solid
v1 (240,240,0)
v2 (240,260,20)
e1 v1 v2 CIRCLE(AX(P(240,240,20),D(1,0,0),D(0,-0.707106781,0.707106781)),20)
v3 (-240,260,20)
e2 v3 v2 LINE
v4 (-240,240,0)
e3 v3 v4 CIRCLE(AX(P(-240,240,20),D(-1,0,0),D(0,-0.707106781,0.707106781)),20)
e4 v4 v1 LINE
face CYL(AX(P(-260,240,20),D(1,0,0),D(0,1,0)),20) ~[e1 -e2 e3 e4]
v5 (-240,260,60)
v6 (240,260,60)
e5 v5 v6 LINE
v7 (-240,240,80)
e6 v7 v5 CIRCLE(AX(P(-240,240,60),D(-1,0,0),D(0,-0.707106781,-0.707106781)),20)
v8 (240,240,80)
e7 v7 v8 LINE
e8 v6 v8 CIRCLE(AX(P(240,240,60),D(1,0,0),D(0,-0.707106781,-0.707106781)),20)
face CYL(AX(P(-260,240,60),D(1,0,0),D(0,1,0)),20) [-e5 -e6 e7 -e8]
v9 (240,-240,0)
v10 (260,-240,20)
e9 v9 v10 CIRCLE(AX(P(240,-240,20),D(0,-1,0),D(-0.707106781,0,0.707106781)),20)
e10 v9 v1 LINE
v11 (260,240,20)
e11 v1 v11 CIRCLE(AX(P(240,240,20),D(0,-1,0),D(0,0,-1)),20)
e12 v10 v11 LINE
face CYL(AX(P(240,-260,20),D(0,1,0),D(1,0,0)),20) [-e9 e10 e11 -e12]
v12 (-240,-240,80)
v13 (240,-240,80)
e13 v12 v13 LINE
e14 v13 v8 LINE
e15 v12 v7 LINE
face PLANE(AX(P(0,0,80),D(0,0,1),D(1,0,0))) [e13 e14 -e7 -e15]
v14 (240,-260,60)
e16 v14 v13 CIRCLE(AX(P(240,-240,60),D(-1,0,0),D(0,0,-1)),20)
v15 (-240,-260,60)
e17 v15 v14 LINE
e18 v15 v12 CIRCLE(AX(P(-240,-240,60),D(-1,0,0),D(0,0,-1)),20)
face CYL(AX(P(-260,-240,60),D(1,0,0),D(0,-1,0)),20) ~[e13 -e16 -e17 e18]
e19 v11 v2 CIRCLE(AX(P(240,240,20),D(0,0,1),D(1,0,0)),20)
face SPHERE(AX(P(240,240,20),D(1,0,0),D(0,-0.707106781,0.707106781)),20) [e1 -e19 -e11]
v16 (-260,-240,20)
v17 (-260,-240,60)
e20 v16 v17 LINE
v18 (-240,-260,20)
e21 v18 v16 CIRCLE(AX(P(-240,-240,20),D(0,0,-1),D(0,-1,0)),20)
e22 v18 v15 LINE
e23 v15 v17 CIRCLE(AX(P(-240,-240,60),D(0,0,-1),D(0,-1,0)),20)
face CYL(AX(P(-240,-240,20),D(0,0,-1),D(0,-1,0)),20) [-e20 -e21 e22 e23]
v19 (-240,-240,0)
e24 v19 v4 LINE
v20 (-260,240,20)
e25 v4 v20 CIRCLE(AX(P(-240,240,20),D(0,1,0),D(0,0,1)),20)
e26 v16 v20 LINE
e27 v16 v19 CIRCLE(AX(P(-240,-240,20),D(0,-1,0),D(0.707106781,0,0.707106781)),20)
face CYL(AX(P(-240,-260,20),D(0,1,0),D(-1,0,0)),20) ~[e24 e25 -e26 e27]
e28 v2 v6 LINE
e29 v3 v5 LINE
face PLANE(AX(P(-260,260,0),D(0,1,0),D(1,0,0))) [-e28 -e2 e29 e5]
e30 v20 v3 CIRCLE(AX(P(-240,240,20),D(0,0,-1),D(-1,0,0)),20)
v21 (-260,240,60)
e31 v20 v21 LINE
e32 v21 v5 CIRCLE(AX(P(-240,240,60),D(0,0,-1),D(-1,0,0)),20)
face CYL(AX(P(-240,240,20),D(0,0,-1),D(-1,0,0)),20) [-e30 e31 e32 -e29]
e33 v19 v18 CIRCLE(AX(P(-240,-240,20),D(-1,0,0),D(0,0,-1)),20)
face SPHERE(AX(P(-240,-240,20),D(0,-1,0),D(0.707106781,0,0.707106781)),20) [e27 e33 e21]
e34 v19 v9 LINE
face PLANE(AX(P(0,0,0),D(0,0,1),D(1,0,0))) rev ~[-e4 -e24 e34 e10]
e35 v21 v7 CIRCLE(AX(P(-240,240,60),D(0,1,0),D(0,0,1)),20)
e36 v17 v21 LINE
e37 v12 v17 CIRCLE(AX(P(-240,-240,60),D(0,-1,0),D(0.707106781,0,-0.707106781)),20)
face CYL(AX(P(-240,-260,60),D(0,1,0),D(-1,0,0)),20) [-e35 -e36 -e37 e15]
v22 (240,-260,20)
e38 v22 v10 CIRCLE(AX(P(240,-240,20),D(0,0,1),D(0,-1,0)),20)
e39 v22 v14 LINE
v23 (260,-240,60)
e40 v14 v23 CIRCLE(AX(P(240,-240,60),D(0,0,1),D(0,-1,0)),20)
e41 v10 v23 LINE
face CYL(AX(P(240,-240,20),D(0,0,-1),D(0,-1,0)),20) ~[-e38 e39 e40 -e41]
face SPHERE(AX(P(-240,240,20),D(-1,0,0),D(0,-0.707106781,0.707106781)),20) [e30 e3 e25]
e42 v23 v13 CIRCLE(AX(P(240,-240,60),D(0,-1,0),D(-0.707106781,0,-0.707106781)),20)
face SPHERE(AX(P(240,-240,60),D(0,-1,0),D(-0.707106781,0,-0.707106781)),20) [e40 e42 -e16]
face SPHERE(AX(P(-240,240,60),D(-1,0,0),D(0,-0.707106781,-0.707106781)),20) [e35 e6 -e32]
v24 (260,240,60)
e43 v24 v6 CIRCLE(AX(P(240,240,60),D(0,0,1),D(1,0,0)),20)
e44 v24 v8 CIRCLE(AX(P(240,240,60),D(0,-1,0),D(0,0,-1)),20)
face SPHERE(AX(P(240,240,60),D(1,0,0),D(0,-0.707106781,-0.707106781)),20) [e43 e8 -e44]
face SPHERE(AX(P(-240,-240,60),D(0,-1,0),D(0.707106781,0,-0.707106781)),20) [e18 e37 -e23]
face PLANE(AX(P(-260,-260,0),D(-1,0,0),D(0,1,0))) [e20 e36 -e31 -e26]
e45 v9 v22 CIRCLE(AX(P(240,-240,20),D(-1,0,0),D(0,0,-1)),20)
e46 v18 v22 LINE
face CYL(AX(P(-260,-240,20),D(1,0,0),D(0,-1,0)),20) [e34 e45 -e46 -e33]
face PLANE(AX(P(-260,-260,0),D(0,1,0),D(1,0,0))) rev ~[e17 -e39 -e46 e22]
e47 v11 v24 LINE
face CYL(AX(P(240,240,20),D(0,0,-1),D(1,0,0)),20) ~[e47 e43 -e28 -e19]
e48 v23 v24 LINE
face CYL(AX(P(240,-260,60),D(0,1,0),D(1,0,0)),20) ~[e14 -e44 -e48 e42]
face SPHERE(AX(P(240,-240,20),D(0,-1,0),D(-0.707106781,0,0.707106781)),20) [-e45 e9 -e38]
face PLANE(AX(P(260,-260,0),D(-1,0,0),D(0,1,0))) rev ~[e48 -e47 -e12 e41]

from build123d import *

# Parameters (mm, degrees)
F0_W         = 520
F0_H         = 520
F1_DEPTH     = 80
F2_R         = 20
F3_T1_DEPTH  = 40
F3_S5_W      = 20
F3_S5_H      = 20
F3_T6_DEPTH  = 20
F3_S11_W     = 20
F3_S11_H     = 20
F3_T12_DEPTH = 20
F3_S17_W     = 20
F3_S17_H     = 20
F3_T18_DEPTH = 20
F3_S23_W     = 20
F3_S23_H     = 20
F3_T24_DEPTH = 20
F3_S29_W     = 20
F3_S29_H     = 20
F3_T30_DEPTH = 20
F3_S35_W     = 20
F3_S35_H     = 20
F3_T36_DEPTH = 20
F3_S41_W     = 20
F3_S41_H     = 20
F3_T42_DEPTH = 20
F3_S47_W     = 20
F3_S47_H     = 20
F3_T48_DEPTH = 20


# Not quite as in the source:
# - a fillet or chamfer that OpenCascade refuses, or shapes differently, is made with other operations: its cross-section is extruded or revolved along the edge and cut away or added


with BuildPart() as f1:
    # F0 (on Top) → F1 (new body)
    with BuildSketch(Plane.XY):
        Rectangle(F0_W, F0_H)
    extrude(amount=F1_DEPTH)

    # F2
    f2_edges = [f1.edges().sort_by_distance(p)[0] for p in [
        (260, 0, 80),
        (0, 260, 80),
        (-260, 0, 80),
        (0, -260, 80),
        (0, -260, 0),
        (260, 0, 0),
        (0, 260, 0),
        (-260, 0, 0),
    ]]
    fillet(f2_edges, radius=F2_R)

    # F3: fillet of radius 20 on 4 edges, made by hand

    # F3_s2 → F3_t1 (cut)
    with BuildSketch(Plane.XY.offset(20)):
        with BuildLine():
            ThreePointArc((240, -260), (254.1421356237, -254.1421356237), (260, -240))
            Line((260, -240), (260, -260))
            Line((260, -260), (240, -260))
        make_face()
        with BuildLine():
            ThreePointArc((260, 240), (254.1421356237, 254.1421356237), (240, 260))
            Line((240, 260), (260, 260))
            Line((260, 260), (260, 240))
        make_face()
        with BuildLine():
            ThreePointArc((-260, 240), (-254.1421356237, 254.1421356237), (-240, 260))
            Line((-240, 260), (-260, 260))
            Line((-260, 260), (-260, 240))
        make_face()
        with BuildLine():
            ThreePointArc((-240, -260), (-254.1421356237, -254.1421356237), (-260, -240))
            Line((-260, -240), (-260, -260))
            Line((-260, -260), (-240, -260))
        make_face()
    extrude(amount=F3_T1_DEPTH, mode=Mode.SUBTRACT)


with BuildPart() as f3_tool4:
    # F3_s5 → F3_t6 (new body)
    with BuildSketch(Plane.XZ.offset(240)):
        with Locations((-250, 10)):
            Rectangle(F3_S5_W, F3_S5_H)
    extrude(amount=F3_T6_DEPTH)

    # F3_s7 → F3_t8 (revolve, cut)
    with BuildSketch(Plane(origin=(-240, -240, 20), x_dir=(0.7071067812, 0, 0.7071067812), z_dir=(0.7071067812, 0, -0.7071067812))):
        with BuildLine():
            ThreePointArc((0, -20), (20, 0), (0, 20))
            Line((0, 20), (0, -20))
        make_face()
    revolve(axis=Axis((-240, -240, 20), (0, -1, 0)), mode=Mode.SUBTRACT)


with BuildPart() as f1_1:
    add(f1.part)

    # F3_t3: cut F3_tool4
    add(f3_tool4.part, mode=Mode.SUBTRACT)


with BuildPart() as f3_tool10:
    # F3_s11 → F3_t12 (new body)
    with BuildSketch(Plane.XZ.offset(240)):
        with Locations((-250, 70)):
            Rectangle(F3_S11_W, F3_S11_H)
    extrude(amount=F3_T12_DEPTH)

    # F3_s13 → F3_t14 (revolve, cut)
    with BuildSketch(Plane(origin=(-240, -240, 60), x_dir=(0.7071067812, 0, -0.7071067812), z_dir=(-0.7071067812, 0, -0.7071067812))):
        with BuildLine():
            ThreePointArc((0, -20), (20, 0), (0, 20))
            Line((0, 20), (0, -20))
        make_face()
    revolve(axis=Axis((-240, -240, 60), (0, -1, 0)), mode=Mode.SUBTRACT)


with BuildPart() as f1_2:
    add(f1_1.part)

    # F3_t9: cut F3_tool10
    add(f3_tool10.part, mode=Mode.SUBTRACT)


with BuildPart() as f3_tool16:
    # F3_s17 → F3_t18 (new body)
    with BuildSketch(Plane.YZ.offset(-240)):
        with Locations((250, 10)):
            Rectangle(F3_S17_W, F3_S17_H)
    extrude(amount=-F3_T18_DEPTH)

    # F3_s19 → F3_t20 (revolve, cut)
    with BuildSketch(Plane(origin=(-240, 240, 20), x_dir=(0, -0.7071067812, 0.7071067812), z_dir=(0, -0.7071067812, -0.7071067812))):
        with BuildLine():
            ThreePointArc((0, -20), (20, 0), (0, 20))
            Line((0, 20), (0, -20))
        make_face()
    revolve(axis=Axis((-240, 240, 20), (-1, 0, 0)), mode=Mode.SUBTRACT)


with BuildPart() as f1_3:
    add(f1_2.part)

    # F3_t15: cut F3_tool16
    add(f3_tool16.part, mode=Mode.SUBTRACT)


with BuildPart() as f3_tool22:
    # F3_s23 → F3_t24 (new body)
    with BuildSketch(Plane.YZ.offset(-240)):
        with Locations((250, 70)):
            Rectangle(F3_S23_W, F3_S23_H)
    extrude(amount=-F3_T24_DEPTH)

    # F3_s25 → F3_t26 (revolve, cut)
    with BuildSketch(Plane(origin=(-240, 240, 60), x_dir=(0, -0.7071067812, -0.7071067812), z_dir=(0, 0.7071067812, -0.7071067812))):
        with BuildLine():
            ThreePointArc((0, -20), (20, 0), (0, 20))
            Line((0, 20), (0, -20))
        make_face()
    revolve(axis=Axis((-240, 240, 60), (-1, 0, 0)), mode=Mode.SUBTRACT)


with BuildPart() as f1_4:
    add(f1_3.part)

    # F3_t21: cut F3_tool22
    add(f3_tool22.part, mode=Mode.SUBTRACT)


with BuildPart() as f3_tool28:
    # F3_s29 → F3_t30 (new body)
    with BuildSketch(Plane.YZ.offset(240)):
        with Locations((250, 10)):
            Rectangle(F3_S29_W, F3_S29_H)
    extrude(amount=F3_T30_DEPTH)

    # F3_s31 → F3_t32 (revolve, cut)
    with BuildSketch(Plane(origin=(240, 240, 20), x_dir=(0, -0.7071067812, 0.7071067812), z_dir=(0, 0.7071067812, 0.7071067812))):
        with BuildLine():
            ThreePointArc((0, -20), (20, 0), (0, 20))
            Line((0, 20), (0, -20))
        make_face()
    revolve(axis=Axis((240, 240, 20), (1, 0, 0)), mode=Mode.SUBTRACT)


with BuildPart() as f1_5:
    add(f1_4.part)

    # F3_t27: cut F3_tool28
    add(f3_tool28.part, mode=Mode.SUBTRACT)


with BuildPart() as f3_tool34:
    # F3_s35 → F3_t36 (new body)
    with BuildSketch(Plane.YZ.offset(240)):
        with Locations((250, 70)):
            Rectangle(F3_S35_W, F3_S35_H)
    extrude(amount=F3_T36_DEPTH)

    # F3_s37 → F3_t38 (revolve, cut)
    with BuildSketch(Plane(origin=(240, 240, 60), x_dir=(0, -0.7071067812, -0.7071067812), z_dir=(0, -0.7071067812, 0.7071067812))):
        with BuildLine():
            ThreePointArc((0, -20), (20, 0), (0, 20))
            Line((0, 20), (0, -20))
        make_face()
    revolve(axis=Axis((240, 240, 60), (1, 0, 0)), mode=Mode.SUBTRACT)


with BuildPart() as f1_6:
    add(f1_5.part)

    # F3_t33: cut F3_tool34
    add(f3_tool34.part, mode=Mode.SUBTRACT)


with BuildPart() as f3_tool40:
    # F3_s41 → F3_t42 (new body)
    with BuildSketch(Plane.XZ.offset(240)):
        with Locations((250, 10)):
            Rectangle(F3_S41_W, F3_S41_H)
    extrude(amount=F3_T42_DEPTH)

    # F3_s43 → F3_t44 (revolve, cut)
    with BuildSketch(Plane(origin=(240, -240, 20), x_dir=(-0.7071067812, 0, 0.7071067812), z_dir=(0.7071067812, 0, 0.7071067812))):
        with BuildLine():
            ThreePointArc((0, -20), (20, 0), (0, 20))
            Line((0, 20), (0, -20))
        make_face()
    revolve(axis=Axis((240, -240, 20), (0, -1, 0)), mode=Mode.SUBTRACT)


with BuildPart() as f1_7:
    add(f1_6.part)

    # F3_t39: cut F3_tool40
    add(f3_tool40.part, mode=Mode.SUBTRACT)


with BuildPart() as f3_tool46:
    # F3_s47 → F3_t48 (new body)
    with BuildSketch(Plane.XZ.offset(240)):
        with Locations((250, 70)):
            Rectangle(F3_S47_W, F3_S47_H)
    extrude(amount=F3_T48_DEPTH)

    # F3_s49 → F3_t50 (revolve, cut)
    with BuildSketch(Plane(origin=(240, -240, 60), x_dir=(-0.7071067812, 0, -0.7071067812), z_dir=(-0.7071067812, 0, 0.7071067812))):
        with BuildLine():
            ThreePointArc((0, -20), (20, 0), (0, 20))
            Line((0, 20), (0, -20))
        make_face()
    revolve(axis=Axis((240, -240, 60), (0, -1, 0)), mode=Mode.SUBTRACT)


with BuildPart() as f1_8:
    add(f1_7.part)

    # F3_t45: cut F3_tool46
    add(f3_tool46.part, mode=Mode.SUBTRACT)


solid = f1_8.part
